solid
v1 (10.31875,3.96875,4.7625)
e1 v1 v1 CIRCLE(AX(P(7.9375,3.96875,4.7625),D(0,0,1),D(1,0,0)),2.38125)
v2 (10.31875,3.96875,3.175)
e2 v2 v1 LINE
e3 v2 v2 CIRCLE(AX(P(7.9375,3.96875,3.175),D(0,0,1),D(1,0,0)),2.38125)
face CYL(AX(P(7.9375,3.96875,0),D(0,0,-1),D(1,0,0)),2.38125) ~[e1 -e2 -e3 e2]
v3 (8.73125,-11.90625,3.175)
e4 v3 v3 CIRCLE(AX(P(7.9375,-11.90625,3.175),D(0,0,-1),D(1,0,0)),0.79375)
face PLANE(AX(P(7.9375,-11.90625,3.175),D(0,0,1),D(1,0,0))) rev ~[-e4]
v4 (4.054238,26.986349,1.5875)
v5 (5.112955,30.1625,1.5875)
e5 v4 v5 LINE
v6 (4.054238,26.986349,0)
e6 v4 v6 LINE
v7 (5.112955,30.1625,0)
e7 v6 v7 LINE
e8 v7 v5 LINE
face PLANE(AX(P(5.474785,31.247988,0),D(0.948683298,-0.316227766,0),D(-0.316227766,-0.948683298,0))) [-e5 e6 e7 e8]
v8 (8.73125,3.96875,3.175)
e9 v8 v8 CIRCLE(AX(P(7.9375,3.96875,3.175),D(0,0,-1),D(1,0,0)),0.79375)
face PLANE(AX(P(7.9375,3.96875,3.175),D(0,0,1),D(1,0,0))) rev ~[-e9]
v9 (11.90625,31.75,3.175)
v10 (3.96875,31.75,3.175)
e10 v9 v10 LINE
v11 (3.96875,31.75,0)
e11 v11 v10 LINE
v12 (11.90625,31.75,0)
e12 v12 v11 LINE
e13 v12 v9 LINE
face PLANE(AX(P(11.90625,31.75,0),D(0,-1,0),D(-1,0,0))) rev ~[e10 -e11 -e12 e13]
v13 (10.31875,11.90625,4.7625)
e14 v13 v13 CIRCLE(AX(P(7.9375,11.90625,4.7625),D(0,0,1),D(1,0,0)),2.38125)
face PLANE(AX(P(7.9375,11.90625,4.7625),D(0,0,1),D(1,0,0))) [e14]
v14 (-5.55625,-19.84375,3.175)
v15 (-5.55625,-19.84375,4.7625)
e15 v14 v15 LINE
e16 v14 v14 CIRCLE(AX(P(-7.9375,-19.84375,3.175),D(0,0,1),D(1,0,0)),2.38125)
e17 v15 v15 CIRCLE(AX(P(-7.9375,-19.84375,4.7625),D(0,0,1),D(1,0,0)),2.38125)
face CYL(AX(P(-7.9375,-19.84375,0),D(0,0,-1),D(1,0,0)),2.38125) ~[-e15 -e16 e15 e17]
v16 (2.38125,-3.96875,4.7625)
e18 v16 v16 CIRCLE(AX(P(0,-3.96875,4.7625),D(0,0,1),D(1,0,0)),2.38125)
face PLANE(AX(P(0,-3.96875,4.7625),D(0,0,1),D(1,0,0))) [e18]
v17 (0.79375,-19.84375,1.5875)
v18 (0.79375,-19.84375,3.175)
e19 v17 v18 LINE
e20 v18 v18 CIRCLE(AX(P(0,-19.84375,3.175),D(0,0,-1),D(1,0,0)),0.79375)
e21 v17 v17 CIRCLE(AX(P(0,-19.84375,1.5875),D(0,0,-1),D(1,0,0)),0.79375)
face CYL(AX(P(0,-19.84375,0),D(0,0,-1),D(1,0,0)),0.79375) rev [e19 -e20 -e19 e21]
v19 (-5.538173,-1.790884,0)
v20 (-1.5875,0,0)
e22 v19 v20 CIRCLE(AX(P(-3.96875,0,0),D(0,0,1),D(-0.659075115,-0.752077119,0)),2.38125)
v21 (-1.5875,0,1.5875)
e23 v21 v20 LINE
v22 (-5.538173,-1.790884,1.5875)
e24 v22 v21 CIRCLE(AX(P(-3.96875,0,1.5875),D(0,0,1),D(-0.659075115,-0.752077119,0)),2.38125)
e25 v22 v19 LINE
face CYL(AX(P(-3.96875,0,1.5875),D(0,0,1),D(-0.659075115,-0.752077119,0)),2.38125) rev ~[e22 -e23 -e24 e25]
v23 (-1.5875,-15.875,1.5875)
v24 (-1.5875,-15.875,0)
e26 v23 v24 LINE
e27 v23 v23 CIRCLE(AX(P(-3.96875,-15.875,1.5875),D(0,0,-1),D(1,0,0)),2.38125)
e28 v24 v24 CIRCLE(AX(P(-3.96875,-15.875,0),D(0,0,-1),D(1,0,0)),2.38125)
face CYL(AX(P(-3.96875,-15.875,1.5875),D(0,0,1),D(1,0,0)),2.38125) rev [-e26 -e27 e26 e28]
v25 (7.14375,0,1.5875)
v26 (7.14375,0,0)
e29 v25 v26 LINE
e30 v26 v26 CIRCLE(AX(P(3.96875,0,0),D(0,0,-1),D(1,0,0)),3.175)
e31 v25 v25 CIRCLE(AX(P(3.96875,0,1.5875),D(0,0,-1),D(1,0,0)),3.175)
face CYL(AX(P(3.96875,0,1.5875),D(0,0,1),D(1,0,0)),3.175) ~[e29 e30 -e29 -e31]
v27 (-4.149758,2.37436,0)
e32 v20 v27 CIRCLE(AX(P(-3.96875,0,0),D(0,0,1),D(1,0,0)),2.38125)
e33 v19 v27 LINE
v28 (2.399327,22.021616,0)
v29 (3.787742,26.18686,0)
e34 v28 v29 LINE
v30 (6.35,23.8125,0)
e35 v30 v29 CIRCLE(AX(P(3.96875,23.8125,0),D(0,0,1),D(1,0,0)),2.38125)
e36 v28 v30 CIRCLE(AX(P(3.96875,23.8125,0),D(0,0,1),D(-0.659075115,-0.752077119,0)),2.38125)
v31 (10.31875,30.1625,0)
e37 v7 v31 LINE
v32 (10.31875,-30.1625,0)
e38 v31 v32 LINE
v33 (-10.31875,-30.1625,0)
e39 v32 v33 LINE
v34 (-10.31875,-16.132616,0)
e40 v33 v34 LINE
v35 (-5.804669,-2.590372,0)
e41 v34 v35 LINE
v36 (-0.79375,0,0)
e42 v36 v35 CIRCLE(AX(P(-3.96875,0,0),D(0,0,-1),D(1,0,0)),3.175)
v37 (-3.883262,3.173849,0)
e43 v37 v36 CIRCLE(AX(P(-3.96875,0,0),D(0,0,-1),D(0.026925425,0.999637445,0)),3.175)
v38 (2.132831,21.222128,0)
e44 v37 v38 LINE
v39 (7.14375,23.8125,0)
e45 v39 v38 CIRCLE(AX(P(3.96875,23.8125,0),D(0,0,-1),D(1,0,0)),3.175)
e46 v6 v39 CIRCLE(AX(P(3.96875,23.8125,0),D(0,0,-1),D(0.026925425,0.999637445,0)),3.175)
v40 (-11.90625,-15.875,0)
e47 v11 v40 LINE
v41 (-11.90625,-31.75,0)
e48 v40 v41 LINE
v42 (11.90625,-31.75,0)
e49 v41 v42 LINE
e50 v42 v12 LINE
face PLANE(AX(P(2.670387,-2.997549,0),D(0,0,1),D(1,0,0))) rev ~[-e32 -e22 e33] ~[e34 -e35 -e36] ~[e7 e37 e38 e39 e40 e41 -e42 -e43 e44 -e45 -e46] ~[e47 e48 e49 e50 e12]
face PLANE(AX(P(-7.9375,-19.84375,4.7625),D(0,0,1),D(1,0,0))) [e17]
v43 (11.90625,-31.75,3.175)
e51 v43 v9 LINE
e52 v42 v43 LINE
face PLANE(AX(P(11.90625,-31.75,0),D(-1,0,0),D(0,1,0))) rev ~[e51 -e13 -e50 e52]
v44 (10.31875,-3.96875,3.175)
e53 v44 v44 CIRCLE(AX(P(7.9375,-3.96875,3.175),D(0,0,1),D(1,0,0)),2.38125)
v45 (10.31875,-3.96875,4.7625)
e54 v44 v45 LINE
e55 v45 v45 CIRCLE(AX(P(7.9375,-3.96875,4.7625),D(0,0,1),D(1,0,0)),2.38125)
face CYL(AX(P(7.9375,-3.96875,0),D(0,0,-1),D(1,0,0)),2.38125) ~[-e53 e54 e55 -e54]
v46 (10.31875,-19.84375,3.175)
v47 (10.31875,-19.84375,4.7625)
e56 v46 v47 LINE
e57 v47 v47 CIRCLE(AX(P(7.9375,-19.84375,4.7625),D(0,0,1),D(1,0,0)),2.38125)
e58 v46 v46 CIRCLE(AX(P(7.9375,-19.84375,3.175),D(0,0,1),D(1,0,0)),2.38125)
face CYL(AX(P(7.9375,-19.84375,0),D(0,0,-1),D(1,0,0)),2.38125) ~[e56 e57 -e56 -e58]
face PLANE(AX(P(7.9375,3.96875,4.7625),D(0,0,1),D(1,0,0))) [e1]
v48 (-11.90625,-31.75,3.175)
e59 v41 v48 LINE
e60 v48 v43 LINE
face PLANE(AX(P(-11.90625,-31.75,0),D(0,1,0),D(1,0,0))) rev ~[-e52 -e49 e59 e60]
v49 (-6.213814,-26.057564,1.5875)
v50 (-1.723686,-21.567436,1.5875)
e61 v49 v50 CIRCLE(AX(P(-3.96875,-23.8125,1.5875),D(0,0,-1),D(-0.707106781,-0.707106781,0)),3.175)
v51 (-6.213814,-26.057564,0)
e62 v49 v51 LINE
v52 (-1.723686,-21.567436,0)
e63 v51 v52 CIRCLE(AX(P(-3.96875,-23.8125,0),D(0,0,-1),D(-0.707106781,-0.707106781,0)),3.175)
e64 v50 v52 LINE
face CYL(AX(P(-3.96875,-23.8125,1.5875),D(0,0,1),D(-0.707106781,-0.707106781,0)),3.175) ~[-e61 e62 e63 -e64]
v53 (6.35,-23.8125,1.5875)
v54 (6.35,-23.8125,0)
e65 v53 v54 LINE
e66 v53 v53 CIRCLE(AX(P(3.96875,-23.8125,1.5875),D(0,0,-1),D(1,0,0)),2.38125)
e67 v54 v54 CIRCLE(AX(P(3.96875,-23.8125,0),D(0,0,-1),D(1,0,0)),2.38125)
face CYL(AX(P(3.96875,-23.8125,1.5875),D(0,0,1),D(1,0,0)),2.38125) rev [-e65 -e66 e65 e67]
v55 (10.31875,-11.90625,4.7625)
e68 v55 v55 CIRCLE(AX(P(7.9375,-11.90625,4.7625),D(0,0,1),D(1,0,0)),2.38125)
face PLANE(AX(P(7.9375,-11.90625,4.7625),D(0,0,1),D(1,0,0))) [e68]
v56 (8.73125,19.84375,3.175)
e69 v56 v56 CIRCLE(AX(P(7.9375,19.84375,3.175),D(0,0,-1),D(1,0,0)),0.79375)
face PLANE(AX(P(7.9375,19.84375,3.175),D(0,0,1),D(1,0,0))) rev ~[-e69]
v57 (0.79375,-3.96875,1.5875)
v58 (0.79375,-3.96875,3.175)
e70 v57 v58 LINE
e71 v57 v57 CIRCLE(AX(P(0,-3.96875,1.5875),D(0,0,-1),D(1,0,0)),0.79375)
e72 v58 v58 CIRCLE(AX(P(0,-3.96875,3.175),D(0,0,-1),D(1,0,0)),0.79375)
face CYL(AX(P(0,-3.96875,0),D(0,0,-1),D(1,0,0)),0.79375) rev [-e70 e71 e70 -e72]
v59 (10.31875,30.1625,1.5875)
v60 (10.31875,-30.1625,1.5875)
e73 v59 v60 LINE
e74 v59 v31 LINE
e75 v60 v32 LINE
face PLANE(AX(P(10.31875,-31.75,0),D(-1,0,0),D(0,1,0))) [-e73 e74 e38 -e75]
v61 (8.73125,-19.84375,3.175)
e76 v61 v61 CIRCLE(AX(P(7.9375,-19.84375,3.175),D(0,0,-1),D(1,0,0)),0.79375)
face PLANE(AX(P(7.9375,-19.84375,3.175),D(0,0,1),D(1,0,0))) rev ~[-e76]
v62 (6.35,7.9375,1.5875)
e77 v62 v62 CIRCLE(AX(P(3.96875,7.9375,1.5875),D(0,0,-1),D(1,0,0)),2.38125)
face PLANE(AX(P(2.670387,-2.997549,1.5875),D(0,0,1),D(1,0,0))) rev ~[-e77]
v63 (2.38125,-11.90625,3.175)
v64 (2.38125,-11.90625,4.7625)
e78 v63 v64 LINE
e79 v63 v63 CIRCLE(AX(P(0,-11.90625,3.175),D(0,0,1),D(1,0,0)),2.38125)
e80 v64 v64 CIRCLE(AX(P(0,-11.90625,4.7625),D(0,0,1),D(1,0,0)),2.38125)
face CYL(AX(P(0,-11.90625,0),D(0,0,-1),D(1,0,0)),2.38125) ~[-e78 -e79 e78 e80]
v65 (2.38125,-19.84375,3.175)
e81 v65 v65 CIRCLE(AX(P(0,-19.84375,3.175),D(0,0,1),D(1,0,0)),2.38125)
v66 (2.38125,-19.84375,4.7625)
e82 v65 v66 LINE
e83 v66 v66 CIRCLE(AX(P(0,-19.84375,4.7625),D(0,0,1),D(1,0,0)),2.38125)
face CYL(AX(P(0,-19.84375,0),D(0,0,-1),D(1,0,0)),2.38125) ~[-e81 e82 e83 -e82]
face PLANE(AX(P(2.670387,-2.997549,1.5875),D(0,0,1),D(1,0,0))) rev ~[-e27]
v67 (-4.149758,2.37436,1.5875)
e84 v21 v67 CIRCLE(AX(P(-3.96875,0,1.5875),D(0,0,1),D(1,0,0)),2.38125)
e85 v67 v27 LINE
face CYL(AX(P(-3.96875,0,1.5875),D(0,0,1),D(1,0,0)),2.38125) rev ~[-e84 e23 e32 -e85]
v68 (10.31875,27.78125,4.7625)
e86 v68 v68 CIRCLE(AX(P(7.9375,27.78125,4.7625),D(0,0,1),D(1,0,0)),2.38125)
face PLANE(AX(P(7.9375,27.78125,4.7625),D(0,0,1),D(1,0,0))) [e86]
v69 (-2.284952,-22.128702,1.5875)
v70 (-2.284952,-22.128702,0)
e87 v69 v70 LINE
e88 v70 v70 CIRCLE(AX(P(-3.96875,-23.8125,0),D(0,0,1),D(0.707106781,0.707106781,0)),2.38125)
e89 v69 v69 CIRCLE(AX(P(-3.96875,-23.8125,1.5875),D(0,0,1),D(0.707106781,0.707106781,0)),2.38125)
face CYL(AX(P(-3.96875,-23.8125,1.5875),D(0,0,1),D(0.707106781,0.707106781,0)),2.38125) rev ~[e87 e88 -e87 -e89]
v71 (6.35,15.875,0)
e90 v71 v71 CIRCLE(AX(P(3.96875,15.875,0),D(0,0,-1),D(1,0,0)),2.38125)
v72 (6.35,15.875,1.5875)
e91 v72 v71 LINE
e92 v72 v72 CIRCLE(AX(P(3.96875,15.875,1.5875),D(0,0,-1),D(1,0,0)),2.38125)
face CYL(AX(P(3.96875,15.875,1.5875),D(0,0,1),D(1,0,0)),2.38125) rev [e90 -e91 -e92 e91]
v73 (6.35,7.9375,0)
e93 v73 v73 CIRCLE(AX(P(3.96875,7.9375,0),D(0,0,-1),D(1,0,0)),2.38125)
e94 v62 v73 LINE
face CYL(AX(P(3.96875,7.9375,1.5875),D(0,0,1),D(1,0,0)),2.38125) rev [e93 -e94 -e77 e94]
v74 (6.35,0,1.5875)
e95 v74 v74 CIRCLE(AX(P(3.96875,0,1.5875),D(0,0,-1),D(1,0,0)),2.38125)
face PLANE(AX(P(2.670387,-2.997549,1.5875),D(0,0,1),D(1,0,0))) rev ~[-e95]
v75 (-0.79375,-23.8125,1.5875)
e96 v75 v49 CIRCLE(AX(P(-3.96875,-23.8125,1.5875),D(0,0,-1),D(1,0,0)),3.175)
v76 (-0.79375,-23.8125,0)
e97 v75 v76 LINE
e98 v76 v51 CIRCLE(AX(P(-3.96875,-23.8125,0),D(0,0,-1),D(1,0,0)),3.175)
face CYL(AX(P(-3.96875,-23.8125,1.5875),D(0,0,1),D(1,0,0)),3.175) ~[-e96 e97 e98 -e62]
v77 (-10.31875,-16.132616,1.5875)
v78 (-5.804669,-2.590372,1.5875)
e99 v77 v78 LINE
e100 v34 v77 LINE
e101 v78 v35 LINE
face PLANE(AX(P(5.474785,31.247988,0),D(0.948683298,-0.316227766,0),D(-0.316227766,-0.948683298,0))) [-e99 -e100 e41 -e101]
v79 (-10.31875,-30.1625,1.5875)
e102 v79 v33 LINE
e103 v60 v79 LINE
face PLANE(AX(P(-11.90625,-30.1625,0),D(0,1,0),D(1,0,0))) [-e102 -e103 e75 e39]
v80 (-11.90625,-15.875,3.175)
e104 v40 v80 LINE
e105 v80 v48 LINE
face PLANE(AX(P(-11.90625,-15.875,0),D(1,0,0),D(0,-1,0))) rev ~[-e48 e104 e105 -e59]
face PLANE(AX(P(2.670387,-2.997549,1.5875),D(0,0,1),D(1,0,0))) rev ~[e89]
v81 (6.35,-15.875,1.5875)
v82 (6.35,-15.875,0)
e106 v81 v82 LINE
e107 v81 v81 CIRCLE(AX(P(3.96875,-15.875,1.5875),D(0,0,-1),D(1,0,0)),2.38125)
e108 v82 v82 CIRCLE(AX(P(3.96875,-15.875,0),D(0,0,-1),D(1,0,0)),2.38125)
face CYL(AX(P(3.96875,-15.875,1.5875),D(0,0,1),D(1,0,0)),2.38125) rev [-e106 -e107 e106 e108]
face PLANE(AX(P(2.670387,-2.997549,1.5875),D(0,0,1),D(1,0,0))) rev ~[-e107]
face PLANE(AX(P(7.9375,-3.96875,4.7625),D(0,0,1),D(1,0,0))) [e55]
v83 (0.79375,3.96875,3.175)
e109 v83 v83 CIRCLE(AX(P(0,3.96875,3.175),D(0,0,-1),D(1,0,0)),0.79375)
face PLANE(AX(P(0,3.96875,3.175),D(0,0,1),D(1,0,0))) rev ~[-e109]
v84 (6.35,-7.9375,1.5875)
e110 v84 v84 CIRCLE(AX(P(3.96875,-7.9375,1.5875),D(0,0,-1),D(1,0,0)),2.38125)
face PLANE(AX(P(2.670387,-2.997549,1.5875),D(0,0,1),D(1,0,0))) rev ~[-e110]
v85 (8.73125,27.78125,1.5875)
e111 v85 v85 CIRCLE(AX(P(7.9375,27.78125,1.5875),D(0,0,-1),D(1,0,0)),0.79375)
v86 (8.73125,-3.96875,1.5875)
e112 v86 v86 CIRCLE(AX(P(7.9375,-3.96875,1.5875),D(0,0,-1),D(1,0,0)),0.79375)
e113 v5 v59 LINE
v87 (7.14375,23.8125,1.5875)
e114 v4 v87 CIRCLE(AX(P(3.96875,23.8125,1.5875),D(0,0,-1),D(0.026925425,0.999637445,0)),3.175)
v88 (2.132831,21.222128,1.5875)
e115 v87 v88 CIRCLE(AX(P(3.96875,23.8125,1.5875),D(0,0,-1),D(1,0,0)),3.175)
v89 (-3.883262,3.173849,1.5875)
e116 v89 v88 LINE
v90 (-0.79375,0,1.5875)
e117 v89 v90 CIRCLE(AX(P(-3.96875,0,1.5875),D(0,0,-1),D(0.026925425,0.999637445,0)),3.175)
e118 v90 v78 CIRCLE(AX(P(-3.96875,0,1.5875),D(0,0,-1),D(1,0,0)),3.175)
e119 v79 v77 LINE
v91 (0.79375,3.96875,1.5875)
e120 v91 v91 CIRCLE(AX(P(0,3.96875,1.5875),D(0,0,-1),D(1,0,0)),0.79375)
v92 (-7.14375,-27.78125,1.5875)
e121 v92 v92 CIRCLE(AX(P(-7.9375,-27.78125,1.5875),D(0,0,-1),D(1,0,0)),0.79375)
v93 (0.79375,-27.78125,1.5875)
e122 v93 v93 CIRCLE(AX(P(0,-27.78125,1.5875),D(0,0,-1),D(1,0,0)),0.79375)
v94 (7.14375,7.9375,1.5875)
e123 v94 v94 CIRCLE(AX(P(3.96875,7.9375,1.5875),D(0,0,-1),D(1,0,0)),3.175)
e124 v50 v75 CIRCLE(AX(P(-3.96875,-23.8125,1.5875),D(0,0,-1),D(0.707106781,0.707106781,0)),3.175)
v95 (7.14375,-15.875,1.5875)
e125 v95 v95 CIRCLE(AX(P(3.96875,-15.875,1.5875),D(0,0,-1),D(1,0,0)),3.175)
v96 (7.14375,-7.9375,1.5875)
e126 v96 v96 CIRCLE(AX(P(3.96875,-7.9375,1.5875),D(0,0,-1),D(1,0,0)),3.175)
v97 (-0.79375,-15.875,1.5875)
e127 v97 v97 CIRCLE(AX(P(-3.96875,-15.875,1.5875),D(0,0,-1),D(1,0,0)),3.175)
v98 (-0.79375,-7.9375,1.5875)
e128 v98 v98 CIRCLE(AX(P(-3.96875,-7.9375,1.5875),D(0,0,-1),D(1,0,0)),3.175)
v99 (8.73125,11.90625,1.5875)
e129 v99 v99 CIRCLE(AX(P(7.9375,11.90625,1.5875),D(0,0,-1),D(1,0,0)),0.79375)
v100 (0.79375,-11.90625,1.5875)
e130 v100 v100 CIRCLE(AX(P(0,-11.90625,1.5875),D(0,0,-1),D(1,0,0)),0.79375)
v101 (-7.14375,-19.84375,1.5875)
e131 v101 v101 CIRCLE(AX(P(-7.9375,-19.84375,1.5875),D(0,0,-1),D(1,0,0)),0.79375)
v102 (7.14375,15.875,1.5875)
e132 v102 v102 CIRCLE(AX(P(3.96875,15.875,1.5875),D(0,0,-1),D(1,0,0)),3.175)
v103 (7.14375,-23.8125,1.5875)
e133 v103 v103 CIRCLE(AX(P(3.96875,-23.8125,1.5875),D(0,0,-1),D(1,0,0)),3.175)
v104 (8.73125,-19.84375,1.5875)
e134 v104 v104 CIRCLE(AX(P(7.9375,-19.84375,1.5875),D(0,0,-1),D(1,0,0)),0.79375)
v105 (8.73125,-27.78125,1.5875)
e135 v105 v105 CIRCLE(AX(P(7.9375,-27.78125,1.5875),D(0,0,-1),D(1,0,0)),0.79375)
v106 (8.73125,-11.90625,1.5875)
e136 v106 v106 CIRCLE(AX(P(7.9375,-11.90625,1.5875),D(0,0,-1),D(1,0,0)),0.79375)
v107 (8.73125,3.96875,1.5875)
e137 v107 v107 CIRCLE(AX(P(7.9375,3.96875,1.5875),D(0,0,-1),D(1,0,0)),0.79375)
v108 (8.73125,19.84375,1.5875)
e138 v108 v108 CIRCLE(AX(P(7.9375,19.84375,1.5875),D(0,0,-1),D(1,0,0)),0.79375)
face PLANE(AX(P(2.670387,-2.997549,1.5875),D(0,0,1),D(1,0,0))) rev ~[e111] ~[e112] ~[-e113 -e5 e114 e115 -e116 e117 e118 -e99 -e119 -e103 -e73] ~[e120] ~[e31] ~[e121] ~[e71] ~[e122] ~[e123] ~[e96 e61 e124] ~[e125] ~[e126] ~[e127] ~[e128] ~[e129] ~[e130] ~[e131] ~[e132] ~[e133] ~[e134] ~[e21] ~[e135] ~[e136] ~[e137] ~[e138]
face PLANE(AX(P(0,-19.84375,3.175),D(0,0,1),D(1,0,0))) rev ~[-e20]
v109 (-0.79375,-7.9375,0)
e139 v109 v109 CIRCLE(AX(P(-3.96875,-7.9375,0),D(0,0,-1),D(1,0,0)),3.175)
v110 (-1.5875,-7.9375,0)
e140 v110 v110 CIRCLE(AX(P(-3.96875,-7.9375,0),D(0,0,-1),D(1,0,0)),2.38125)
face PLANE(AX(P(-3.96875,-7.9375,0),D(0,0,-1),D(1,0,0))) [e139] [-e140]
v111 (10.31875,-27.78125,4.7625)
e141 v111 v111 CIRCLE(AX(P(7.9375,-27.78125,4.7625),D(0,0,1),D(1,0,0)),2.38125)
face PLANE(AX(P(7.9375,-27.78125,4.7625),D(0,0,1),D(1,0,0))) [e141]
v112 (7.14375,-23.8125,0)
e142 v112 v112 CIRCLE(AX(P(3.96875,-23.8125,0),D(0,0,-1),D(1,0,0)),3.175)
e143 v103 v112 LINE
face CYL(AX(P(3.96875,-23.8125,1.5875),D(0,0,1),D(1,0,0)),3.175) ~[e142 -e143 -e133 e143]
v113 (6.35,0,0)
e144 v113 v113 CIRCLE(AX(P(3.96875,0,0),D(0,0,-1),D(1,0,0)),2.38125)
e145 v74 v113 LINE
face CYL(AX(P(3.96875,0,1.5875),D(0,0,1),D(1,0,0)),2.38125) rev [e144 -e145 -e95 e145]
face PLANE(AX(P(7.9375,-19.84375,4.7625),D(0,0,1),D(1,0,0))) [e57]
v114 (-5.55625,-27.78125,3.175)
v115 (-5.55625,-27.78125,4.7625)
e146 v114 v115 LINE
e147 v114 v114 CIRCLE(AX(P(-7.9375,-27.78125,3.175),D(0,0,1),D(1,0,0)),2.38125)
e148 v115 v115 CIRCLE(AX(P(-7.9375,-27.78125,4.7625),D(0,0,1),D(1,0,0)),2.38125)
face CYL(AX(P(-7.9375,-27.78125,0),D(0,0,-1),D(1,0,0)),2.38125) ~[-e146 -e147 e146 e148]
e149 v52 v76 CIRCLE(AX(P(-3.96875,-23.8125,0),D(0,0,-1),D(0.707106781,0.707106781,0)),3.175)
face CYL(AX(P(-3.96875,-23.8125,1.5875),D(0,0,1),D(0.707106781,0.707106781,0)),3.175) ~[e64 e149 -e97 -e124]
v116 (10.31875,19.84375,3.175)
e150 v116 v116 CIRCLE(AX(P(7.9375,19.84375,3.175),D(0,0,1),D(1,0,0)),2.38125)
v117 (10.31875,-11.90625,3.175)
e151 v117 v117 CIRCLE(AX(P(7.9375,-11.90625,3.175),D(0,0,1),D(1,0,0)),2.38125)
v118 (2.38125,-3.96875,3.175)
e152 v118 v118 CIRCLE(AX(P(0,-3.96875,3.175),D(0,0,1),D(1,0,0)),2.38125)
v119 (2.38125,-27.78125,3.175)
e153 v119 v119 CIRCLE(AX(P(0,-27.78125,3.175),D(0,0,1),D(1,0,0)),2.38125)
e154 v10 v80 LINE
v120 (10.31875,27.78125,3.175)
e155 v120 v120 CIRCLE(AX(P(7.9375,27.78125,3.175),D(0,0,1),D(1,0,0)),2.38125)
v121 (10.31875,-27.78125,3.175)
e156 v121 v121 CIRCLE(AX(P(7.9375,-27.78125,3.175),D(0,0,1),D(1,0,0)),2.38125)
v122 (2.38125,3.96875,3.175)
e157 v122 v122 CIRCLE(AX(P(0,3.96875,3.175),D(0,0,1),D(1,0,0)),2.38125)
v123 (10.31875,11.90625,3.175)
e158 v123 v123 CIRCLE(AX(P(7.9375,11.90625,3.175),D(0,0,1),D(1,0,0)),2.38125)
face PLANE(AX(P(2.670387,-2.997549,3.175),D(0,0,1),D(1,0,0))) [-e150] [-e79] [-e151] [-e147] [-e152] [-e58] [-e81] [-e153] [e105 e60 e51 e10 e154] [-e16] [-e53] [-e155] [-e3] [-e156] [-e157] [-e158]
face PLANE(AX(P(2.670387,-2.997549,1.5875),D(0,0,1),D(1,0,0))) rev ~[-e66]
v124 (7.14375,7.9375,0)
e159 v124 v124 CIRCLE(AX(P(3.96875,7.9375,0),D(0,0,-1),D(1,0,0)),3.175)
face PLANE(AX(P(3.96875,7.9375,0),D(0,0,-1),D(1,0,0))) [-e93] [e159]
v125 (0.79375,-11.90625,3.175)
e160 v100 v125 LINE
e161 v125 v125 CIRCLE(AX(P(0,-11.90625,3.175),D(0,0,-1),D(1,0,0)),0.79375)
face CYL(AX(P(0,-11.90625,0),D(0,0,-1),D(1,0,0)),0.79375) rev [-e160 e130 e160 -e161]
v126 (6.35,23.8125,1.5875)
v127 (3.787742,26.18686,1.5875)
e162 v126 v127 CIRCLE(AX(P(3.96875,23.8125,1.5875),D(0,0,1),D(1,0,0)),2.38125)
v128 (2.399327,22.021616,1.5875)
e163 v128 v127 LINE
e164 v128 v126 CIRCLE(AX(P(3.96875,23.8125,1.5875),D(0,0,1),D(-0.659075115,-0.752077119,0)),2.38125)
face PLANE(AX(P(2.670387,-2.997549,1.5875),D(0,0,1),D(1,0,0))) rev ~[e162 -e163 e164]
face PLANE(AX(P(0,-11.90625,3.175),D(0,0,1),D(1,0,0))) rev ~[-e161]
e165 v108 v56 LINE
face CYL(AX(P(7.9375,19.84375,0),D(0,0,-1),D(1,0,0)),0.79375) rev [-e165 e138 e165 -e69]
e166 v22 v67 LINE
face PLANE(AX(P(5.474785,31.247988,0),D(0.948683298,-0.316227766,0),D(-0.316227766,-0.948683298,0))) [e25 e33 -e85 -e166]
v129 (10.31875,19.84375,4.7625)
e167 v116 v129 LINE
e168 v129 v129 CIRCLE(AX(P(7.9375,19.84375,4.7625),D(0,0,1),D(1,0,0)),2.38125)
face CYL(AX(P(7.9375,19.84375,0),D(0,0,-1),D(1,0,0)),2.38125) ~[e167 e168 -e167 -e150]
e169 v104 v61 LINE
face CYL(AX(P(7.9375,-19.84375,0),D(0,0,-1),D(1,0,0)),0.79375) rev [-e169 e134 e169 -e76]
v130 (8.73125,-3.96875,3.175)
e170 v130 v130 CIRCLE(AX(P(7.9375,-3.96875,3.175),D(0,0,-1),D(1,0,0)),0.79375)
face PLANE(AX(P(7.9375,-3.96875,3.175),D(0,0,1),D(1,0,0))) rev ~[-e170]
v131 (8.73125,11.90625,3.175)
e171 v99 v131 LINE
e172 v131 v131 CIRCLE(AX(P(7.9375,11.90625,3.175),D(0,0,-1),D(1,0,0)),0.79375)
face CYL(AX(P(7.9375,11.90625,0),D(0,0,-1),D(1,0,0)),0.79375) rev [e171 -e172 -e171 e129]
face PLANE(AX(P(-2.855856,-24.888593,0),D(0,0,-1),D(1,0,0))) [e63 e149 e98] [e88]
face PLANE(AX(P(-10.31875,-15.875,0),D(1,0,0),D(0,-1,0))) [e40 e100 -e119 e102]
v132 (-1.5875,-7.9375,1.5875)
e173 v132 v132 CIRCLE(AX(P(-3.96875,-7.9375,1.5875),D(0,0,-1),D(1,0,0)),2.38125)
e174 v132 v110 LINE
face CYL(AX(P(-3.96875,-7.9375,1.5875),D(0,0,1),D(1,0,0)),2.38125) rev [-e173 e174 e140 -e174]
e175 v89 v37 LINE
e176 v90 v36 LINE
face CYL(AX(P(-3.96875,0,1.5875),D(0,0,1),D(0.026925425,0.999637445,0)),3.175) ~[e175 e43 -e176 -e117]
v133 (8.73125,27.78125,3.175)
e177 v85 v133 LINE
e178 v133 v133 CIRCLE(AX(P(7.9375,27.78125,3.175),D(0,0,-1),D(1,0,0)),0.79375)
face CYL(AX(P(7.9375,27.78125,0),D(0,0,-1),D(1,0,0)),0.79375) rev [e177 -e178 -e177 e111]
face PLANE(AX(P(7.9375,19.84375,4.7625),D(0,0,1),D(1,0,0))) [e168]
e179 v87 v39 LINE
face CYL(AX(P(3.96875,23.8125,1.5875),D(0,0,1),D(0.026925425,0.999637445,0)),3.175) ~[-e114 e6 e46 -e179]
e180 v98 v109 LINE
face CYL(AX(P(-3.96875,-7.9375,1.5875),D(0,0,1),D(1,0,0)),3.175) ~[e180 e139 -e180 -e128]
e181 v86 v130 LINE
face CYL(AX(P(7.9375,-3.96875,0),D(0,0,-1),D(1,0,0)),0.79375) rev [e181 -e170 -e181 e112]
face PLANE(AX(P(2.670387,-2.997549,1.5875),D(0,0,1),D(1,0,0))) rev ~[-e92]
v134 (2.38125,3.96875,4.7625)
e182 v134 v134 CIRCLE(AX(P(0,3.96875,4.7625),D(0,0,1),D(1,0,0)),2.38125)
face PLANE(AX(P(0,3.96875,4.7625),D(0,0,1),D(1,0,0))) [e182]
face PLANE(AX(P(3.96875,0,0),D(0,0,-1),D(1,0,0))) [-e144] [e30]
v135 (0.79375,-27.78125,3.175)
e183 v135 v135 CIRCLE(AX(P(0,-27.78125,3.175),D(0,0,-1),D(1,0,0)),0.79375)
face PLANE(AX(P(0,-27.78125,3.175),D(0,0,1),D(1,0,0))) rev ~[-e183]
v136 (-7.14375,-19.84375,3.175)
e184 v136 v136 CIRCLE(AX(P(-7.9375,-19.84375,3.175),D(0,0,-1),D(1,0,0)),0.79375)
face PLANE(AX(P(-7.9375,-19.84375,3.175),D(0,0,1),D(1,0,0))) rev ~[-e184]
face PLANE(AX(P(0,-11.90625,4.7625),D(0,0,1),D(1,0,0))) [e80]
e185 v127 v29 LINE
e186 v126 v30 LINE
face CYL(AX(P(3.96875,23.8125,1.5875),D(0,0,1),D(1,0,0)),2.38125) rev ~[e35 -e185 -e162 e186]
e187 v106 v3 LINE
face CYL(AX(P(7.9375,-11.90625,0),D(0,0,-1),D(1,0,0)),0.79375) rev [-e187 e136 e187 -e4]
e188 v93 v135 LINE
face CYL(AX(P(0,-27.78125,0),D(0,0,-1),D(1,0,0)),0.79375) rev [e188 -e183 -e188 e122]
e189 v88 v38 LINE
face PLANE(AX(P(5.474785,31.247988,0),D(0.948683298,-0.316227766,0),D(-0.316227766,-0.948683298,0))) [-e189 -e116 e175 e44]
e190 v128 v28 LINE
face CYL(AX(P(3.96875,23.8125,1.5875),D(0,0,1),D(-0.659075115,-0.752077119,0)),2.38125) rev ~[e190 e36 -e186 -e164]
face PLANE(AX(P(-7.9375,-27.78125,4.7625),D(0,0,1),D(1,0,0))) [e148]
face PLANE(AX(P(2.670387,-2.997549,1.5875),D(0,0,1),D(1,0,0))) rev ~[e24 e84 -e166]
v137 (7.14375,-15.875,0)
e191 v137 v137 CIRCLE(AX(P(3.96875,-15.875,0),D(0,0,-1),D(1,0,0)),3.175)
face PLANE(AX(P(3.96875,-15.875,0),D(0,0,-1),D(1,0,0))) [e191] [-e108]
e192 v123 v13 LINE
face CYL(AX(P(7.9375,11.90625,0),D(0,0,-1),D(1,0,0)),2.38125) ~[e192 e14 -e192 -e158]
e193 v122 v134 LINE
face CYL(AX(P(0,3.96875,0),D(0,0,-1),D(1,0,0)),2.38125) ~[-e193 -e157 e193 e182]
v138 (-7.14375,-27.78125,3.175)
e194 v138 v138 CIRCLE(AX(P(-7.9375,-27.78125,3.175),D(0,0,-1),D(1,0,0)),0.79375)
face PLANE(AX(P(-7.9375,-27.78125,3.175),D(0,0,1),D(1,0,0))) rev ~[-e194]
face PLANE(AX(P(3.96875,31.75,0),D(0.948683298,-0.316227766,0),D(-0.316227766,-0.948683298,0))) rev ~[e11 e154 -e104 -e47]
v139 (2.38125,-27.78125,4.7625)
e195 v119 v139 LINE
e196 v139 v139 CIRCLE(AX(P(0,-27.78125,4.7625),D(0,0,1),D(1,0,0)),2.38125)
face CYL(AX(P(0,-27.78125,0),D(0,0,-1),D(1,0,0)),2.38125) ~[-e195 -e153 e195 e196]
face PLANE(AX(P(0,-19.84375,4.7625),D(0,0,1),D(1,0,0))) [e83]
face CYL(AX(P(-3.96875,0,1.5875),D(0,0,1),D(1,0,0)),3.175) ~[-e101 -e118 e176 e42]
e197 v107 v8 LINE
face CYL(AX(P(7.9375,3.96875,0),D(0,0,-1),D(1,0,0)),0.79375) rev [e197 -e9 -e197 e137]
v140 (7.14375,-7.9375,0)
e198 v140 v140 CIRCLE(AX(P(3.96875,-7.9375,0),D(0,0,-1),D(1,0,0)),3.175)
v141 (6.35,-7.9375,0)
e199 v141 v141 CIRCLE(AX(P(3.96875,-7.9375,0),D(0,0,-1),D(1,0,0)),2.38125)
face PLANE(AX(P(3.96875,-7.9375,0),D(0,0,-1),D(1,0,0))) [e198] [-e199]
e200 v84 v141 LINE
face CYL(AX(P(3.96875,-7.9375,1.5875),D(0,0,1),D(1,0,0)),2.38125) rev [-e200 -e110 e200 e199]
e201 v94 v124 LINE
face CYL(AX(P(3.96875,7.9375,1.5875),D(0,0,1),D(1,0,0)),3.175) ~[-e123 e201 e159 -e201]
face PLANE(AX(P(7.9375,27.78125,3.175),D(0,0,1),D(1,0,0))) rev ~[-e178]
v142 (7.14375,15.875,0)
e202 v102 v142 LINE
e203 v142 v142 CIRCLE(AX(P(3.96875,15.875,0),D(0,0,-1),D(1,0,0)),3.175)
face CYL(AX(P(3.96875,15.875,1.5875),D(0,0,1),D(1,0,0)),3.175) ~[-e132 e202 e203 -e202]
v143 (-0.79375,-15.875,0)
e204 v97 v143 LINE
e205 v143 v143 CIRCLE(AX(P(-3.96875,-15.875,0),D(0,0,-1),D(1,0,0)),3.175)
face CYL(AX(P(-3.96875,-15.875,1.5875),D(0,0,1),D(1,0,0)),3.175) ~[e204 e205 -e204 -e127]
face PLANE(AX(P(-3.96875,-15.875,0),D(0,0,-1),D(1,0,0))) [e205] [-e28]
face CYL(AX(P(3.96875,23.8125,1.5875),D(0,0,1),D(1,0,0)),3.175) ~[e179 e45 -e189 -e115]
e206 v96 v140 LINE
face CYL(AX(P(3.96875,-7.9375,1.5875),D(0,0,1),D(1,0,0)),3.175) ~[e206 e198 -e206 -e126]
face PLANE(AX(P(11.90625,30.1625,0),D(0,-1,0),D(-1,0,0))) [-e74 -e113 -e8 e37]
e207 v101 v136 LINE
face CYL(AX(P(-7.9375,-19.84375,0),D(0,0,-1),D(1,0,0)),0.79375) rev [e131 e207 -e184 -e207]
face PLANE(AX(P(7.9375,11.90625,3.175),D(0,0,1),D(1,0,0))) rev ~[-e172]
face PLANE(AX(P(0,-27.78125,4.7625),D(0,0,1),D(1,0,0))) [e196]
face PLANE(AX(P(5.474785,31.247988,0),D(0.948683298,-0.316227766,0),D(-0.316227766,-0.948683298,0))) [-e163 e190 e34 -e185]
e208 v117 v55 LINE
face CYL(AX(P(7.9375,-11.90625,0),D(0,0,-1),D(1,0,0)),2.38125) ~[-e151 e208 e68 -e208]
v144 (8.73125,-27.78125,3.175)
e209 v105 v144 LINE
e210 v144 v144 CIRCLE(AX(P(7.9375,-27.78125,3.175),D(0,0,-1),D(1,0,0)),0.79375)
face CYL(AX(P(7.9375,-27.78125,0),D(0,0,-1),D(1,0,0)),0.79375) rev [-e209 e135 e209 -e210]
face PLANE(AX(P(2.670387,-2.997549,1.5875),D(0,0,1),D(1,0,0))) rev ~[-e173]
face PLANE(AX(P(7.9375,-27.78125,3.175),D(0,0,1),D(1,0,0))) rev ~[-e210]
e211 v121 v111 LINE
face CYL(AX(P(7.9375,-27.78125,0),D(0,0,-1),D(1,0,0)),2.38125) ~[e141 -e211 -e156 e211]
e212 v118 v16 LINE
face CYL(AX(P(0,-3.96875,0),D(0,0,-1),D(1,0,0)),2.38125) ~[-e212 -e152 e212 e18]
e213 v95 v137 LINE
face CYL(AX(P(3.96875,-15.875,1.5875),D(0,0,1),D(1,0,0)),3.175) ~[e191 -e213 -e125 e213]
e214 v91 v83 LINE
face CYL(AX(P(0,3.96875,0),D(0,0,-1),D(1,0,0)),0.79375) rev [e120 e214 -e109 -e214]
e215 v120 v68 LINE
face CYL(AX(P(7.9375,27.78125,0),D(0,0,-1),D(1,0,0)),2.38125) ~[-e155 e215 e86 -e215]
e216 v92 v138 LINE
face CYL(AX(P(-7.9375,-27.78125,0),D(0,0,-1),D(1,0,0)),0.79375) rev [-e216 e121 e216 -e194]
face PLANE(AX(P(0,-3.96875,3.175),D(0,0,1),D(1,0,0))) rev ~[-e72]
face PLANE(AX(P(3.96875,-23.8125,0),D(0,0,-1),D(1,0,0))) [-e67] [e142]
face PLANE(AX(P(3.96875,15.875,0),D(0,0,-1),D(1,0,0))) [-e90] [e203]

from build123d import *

# Parameters (mm, degrees)
F0_R     = 2.38125
F1_DEPTH = 3.175
F2_DEPTH = 4.7625
F3_T     = -1.5875
F4_R     = 3.175
F4_R_2   = 2.38125
F5_DEPTH = 1.5875


with BuildPart() as f1:
    # F0 (on Top) → F1 (new body)
    with BuildSketch(Plane.XY):
        Polygon((11.90625, 31.75), (3.96875, 31.75), (-11.90625, -15.875), (-11.90625, -31.75), (11.90625, -31.75), align=None)
        with Locations((-7.9375, -27.78125)):
            Circle(F0_R, mode=Mode.SUBTRACT)
        with Locations((-7.9375, -19.84375)):
            Circle(F0_R, mode=Mode.SUBTRACT)
        with Locations((0, -27.78125)):
            Circle(F0_R, mode=Mode.SUBTRACT)
        with Locations((0, -19.84375)):
            Circle(F0_R, mode=Mode.SUBTRACT)
        with Locations((7.9375, -27.78125)):
            Circle(F0_R, mode=Mode.SUBTRACT)
        with Locations((7.9375, -19.84375)):
            Circle(F0_R, mode=Mode.SUBTRACT)
        with Locations((0, -11.90625)):
            Circle(F0_R, mode=Mode.SUBTRACT)
        with Locations((0, -3.96875)):
            Circle(F0_R, mode=Mode.SUBTRACT)
        with Locations((7.9375, -11.90625)):
            Circle(F0_R, mode=Mode.SUBTRACT)
        with Locations((7.9375, -3.96875)):
            Circle(F0_R, mode=Mode.SUBTRACT)
        with Locations((0, 3.96875)):
            Circle(F0_R, mode=Mode.SUBTRACT)
        with Locations((7.9375, 3.96875)):
            Circle(F0_R, mode=Mode.SUBTRACT)
        with Locations((7.9375, 11.90625)):
            Circle(F0_R, mode=Mode.SUBTRACT)
        with Locations((7.9375, 19.84375)):
            Circle(F0_R, mode=Mode.SUBTRACT)
        with Locations((7.9375, 27.78125)):
            Circle(F0_R, mode=Mode.SUBTRACT)
    extrude(amount=F1_DEPTH)

    # F0 (on Top) → F2 (join)
    with BuildSketch(Plane.XY):
        with Locations((7.9375, 27.78125)):
            Circle(F0_R)
        with Locations((7.9375, 19.84375)):
            Circle(F0_R)
        with Locations((7.9375, 11.90625)):
            Circle(F0_R)
        with Locations((0, 3.96875)):
            Circle(F0_R)
        with Locations((7.9375, 3.96875)):
            Circle(F0_R)
        with Locations((7.9375, -3.96875)):
            Circle(F0_R)
        with Locations((0, -3.96875)):
            Circle(F0_R)
        with Locations((0, -11.90625)):
            Circle(F0_R)
        with Locations((7.9375, -11.90625)):
            Circle(F0_R)
        with Locations((7.9375, -19.84375)):
            Circle(F0_R)
        with Locations((0, -19.84375)):
            Circle(F0_R)
        with Locations((-7.9375, -19.84375)):
            Circle(F0_R)
        with Locations((-7.9375, -27.78125)):
            Circle(F0_R)
        with Locations((0, -27.78125)):
            Circle(F0_R)
        with Locations((7.9375, -27.78125)):
            Circle(F0_R)
    extrude(amount=F2_DEPTH)

    # F3
    f3_openings = [f1.faces().sort_by_distance(p)[0] for p in [
        (2.204861, -5.291667, 0),
    ]]
    offset(amount=F3_T, openings=f3_openings, kind=Kind.INTERSECTION)

    # F4 (on face) → F5 (join)
    with BuildSketch(Plane(origin=(0, 0, 1.5875), x_dir=(1, 0, 0), z_dir=(0, 0, -1))):
        with BuildLine():
            ThreePointArc((-0.79375, 23.8125), (-2.7537301022, 26.7458175157), (-6.2138140303, 26.0575640303))
            Line((-6.2138140303, 26.0575640303), (-5.6525480227, 25.4962980227))
            ThreePointArc((-5.6525480227, 25.4962980227), (-3.0574850767, 26.0124881368), (-1.5875, 23.8125))
            ThreePointArc((-1.5875, 23.8125), (-1.7687618632, 22.9012350767), (-2.2849519773, 22.1287019773))
            Line((-2.2849519773, 22.1287019773), (-1.7236859697, 21.5674359697))
            ThreePointArc((-1.7236859697, 21.5674359697), (-1.0354324843, 22.5974801022), (-0.79375, 23.8125))
        make_face()
        with BuildLine():
            Line((-5.6525480227, 25.4962980227), (-6.2138140303, 26.0575640303))
            ThreePointArc((-6.2138140303, 26.0575640303), (-6.2138140303, 21.5674359697), (-1.7236859697, 21.5674359697))
            Line((-1.7236859697, 21.5674359697), (-2.2849519773, 22.1287019773))
            ThreePointArc((-2.2849519773, 22.1287019773), (-5.6525480227, 22.1287019773), (-5.6525480227, 25.4962980227))
        make_face()
        with Locations((-3.96875, 15.875)):
            Circle(F4_R)
        with Locations((-3.96875, 15.875)):
            Circle(F4_R_2, mode=Mode.SUBTRACT)
        with Locations((-3.96875, 7.9375)):
            Circle(F4_R)
        with Locations((-3.96875, 7.9375)):
            Circle(F4_R_2, mode=Mode.SUBTRACT)
        with BuildLine():
            ThreePointArc((-3.8832617755, -3.1738488879), (-1.6936620772, -2.2146331397), (-0.79375, 0))
            ThreePointArc((-0.79375, 0), (-2.5107405764, 2.8204314423), (-5.8046687532, 2.590372045))
            Line((-5.8046687532, 2.590372045), (-5.5381726179, 1.7908836392))
            ThreePointArc((-5.5381726179, 1.7908836392), (-2.9856009895, 2.1688175547), (-1.5875, 0))
            ThreePointArc((-1.5875, 0), (-2.350212624, -1.7466219754), (-4.1497579108, -2.3743604821))
            Line((-4.1497579108, -2.3743604821), (-3.8832617755, -3.1738488879))
        make_face()
        with BuildLine():
            ThreePointArc((7.14375, -23.8125), (5.4267594236, -20.9920685577), (2.1328312468, -21.222127955))
            Line((2.1328312468, -21.222127955), (2.3993273821, -22.0216163608))
            ThreePointArc((2.3993273821, -22.0216163608), (4.9518990105, -21.6436824453), (6.35, -23.8125))
            ThreePointArc((6.35, -23.8125), (5.587287376, -25.5591219754), (3.7877420892, -26.1868604821))
            Line((3.7877420892, -26.1868604821), (4.0542382245, -26.9863488879))
            ThreePointArc((4.0542382245, -26.9863488879), (6.2438379228, -26.0271331397), (7.14375, -23.8125))
        make_face()
        with Locations((3.96875, 23.8125)):
            Circle(F4_R)
        with Locations((3.96875, 23.8125)):
            Circle(F4_R_2, mode=Mode.SUBTRACT)
        with Locations((3.96875, 15.875)):
            Circle(F4_R)
        with Locations((3.96875, 15.875)):
            Circle(F4_R_2, mode=Mode.SUBTRACT)
        with Locations((3.96875, 7.9375)):
            Circle(F4_R)
        with Locations((3.96875, 7.9375)):
            Circle(F4_R_2, mode=Mode.SUBTRACT)
        with Locations((3.96875, 0)):
            Circle(F4_R)
        with Locations((3.96875, 0)):
            Circle(F4_R_2, mode=Mode.SUBTRACT)
        with Locations((3.96875, -7.9375)):
            Circle(F4_R)
        with Locations((3.96875, -7.9375)):
            Circle(F4_R_2, mode=Mode.SUBTRACT)
        with Locations((3.96875, -15.875)):
            Circle(F4_R)
        with Locations((3.96875, -15.875)):
            Circle(F4_R_2, mode=Mode.SUBTRACT)
    extrude(amount=F5_DEPTH)


solid = f1.part
